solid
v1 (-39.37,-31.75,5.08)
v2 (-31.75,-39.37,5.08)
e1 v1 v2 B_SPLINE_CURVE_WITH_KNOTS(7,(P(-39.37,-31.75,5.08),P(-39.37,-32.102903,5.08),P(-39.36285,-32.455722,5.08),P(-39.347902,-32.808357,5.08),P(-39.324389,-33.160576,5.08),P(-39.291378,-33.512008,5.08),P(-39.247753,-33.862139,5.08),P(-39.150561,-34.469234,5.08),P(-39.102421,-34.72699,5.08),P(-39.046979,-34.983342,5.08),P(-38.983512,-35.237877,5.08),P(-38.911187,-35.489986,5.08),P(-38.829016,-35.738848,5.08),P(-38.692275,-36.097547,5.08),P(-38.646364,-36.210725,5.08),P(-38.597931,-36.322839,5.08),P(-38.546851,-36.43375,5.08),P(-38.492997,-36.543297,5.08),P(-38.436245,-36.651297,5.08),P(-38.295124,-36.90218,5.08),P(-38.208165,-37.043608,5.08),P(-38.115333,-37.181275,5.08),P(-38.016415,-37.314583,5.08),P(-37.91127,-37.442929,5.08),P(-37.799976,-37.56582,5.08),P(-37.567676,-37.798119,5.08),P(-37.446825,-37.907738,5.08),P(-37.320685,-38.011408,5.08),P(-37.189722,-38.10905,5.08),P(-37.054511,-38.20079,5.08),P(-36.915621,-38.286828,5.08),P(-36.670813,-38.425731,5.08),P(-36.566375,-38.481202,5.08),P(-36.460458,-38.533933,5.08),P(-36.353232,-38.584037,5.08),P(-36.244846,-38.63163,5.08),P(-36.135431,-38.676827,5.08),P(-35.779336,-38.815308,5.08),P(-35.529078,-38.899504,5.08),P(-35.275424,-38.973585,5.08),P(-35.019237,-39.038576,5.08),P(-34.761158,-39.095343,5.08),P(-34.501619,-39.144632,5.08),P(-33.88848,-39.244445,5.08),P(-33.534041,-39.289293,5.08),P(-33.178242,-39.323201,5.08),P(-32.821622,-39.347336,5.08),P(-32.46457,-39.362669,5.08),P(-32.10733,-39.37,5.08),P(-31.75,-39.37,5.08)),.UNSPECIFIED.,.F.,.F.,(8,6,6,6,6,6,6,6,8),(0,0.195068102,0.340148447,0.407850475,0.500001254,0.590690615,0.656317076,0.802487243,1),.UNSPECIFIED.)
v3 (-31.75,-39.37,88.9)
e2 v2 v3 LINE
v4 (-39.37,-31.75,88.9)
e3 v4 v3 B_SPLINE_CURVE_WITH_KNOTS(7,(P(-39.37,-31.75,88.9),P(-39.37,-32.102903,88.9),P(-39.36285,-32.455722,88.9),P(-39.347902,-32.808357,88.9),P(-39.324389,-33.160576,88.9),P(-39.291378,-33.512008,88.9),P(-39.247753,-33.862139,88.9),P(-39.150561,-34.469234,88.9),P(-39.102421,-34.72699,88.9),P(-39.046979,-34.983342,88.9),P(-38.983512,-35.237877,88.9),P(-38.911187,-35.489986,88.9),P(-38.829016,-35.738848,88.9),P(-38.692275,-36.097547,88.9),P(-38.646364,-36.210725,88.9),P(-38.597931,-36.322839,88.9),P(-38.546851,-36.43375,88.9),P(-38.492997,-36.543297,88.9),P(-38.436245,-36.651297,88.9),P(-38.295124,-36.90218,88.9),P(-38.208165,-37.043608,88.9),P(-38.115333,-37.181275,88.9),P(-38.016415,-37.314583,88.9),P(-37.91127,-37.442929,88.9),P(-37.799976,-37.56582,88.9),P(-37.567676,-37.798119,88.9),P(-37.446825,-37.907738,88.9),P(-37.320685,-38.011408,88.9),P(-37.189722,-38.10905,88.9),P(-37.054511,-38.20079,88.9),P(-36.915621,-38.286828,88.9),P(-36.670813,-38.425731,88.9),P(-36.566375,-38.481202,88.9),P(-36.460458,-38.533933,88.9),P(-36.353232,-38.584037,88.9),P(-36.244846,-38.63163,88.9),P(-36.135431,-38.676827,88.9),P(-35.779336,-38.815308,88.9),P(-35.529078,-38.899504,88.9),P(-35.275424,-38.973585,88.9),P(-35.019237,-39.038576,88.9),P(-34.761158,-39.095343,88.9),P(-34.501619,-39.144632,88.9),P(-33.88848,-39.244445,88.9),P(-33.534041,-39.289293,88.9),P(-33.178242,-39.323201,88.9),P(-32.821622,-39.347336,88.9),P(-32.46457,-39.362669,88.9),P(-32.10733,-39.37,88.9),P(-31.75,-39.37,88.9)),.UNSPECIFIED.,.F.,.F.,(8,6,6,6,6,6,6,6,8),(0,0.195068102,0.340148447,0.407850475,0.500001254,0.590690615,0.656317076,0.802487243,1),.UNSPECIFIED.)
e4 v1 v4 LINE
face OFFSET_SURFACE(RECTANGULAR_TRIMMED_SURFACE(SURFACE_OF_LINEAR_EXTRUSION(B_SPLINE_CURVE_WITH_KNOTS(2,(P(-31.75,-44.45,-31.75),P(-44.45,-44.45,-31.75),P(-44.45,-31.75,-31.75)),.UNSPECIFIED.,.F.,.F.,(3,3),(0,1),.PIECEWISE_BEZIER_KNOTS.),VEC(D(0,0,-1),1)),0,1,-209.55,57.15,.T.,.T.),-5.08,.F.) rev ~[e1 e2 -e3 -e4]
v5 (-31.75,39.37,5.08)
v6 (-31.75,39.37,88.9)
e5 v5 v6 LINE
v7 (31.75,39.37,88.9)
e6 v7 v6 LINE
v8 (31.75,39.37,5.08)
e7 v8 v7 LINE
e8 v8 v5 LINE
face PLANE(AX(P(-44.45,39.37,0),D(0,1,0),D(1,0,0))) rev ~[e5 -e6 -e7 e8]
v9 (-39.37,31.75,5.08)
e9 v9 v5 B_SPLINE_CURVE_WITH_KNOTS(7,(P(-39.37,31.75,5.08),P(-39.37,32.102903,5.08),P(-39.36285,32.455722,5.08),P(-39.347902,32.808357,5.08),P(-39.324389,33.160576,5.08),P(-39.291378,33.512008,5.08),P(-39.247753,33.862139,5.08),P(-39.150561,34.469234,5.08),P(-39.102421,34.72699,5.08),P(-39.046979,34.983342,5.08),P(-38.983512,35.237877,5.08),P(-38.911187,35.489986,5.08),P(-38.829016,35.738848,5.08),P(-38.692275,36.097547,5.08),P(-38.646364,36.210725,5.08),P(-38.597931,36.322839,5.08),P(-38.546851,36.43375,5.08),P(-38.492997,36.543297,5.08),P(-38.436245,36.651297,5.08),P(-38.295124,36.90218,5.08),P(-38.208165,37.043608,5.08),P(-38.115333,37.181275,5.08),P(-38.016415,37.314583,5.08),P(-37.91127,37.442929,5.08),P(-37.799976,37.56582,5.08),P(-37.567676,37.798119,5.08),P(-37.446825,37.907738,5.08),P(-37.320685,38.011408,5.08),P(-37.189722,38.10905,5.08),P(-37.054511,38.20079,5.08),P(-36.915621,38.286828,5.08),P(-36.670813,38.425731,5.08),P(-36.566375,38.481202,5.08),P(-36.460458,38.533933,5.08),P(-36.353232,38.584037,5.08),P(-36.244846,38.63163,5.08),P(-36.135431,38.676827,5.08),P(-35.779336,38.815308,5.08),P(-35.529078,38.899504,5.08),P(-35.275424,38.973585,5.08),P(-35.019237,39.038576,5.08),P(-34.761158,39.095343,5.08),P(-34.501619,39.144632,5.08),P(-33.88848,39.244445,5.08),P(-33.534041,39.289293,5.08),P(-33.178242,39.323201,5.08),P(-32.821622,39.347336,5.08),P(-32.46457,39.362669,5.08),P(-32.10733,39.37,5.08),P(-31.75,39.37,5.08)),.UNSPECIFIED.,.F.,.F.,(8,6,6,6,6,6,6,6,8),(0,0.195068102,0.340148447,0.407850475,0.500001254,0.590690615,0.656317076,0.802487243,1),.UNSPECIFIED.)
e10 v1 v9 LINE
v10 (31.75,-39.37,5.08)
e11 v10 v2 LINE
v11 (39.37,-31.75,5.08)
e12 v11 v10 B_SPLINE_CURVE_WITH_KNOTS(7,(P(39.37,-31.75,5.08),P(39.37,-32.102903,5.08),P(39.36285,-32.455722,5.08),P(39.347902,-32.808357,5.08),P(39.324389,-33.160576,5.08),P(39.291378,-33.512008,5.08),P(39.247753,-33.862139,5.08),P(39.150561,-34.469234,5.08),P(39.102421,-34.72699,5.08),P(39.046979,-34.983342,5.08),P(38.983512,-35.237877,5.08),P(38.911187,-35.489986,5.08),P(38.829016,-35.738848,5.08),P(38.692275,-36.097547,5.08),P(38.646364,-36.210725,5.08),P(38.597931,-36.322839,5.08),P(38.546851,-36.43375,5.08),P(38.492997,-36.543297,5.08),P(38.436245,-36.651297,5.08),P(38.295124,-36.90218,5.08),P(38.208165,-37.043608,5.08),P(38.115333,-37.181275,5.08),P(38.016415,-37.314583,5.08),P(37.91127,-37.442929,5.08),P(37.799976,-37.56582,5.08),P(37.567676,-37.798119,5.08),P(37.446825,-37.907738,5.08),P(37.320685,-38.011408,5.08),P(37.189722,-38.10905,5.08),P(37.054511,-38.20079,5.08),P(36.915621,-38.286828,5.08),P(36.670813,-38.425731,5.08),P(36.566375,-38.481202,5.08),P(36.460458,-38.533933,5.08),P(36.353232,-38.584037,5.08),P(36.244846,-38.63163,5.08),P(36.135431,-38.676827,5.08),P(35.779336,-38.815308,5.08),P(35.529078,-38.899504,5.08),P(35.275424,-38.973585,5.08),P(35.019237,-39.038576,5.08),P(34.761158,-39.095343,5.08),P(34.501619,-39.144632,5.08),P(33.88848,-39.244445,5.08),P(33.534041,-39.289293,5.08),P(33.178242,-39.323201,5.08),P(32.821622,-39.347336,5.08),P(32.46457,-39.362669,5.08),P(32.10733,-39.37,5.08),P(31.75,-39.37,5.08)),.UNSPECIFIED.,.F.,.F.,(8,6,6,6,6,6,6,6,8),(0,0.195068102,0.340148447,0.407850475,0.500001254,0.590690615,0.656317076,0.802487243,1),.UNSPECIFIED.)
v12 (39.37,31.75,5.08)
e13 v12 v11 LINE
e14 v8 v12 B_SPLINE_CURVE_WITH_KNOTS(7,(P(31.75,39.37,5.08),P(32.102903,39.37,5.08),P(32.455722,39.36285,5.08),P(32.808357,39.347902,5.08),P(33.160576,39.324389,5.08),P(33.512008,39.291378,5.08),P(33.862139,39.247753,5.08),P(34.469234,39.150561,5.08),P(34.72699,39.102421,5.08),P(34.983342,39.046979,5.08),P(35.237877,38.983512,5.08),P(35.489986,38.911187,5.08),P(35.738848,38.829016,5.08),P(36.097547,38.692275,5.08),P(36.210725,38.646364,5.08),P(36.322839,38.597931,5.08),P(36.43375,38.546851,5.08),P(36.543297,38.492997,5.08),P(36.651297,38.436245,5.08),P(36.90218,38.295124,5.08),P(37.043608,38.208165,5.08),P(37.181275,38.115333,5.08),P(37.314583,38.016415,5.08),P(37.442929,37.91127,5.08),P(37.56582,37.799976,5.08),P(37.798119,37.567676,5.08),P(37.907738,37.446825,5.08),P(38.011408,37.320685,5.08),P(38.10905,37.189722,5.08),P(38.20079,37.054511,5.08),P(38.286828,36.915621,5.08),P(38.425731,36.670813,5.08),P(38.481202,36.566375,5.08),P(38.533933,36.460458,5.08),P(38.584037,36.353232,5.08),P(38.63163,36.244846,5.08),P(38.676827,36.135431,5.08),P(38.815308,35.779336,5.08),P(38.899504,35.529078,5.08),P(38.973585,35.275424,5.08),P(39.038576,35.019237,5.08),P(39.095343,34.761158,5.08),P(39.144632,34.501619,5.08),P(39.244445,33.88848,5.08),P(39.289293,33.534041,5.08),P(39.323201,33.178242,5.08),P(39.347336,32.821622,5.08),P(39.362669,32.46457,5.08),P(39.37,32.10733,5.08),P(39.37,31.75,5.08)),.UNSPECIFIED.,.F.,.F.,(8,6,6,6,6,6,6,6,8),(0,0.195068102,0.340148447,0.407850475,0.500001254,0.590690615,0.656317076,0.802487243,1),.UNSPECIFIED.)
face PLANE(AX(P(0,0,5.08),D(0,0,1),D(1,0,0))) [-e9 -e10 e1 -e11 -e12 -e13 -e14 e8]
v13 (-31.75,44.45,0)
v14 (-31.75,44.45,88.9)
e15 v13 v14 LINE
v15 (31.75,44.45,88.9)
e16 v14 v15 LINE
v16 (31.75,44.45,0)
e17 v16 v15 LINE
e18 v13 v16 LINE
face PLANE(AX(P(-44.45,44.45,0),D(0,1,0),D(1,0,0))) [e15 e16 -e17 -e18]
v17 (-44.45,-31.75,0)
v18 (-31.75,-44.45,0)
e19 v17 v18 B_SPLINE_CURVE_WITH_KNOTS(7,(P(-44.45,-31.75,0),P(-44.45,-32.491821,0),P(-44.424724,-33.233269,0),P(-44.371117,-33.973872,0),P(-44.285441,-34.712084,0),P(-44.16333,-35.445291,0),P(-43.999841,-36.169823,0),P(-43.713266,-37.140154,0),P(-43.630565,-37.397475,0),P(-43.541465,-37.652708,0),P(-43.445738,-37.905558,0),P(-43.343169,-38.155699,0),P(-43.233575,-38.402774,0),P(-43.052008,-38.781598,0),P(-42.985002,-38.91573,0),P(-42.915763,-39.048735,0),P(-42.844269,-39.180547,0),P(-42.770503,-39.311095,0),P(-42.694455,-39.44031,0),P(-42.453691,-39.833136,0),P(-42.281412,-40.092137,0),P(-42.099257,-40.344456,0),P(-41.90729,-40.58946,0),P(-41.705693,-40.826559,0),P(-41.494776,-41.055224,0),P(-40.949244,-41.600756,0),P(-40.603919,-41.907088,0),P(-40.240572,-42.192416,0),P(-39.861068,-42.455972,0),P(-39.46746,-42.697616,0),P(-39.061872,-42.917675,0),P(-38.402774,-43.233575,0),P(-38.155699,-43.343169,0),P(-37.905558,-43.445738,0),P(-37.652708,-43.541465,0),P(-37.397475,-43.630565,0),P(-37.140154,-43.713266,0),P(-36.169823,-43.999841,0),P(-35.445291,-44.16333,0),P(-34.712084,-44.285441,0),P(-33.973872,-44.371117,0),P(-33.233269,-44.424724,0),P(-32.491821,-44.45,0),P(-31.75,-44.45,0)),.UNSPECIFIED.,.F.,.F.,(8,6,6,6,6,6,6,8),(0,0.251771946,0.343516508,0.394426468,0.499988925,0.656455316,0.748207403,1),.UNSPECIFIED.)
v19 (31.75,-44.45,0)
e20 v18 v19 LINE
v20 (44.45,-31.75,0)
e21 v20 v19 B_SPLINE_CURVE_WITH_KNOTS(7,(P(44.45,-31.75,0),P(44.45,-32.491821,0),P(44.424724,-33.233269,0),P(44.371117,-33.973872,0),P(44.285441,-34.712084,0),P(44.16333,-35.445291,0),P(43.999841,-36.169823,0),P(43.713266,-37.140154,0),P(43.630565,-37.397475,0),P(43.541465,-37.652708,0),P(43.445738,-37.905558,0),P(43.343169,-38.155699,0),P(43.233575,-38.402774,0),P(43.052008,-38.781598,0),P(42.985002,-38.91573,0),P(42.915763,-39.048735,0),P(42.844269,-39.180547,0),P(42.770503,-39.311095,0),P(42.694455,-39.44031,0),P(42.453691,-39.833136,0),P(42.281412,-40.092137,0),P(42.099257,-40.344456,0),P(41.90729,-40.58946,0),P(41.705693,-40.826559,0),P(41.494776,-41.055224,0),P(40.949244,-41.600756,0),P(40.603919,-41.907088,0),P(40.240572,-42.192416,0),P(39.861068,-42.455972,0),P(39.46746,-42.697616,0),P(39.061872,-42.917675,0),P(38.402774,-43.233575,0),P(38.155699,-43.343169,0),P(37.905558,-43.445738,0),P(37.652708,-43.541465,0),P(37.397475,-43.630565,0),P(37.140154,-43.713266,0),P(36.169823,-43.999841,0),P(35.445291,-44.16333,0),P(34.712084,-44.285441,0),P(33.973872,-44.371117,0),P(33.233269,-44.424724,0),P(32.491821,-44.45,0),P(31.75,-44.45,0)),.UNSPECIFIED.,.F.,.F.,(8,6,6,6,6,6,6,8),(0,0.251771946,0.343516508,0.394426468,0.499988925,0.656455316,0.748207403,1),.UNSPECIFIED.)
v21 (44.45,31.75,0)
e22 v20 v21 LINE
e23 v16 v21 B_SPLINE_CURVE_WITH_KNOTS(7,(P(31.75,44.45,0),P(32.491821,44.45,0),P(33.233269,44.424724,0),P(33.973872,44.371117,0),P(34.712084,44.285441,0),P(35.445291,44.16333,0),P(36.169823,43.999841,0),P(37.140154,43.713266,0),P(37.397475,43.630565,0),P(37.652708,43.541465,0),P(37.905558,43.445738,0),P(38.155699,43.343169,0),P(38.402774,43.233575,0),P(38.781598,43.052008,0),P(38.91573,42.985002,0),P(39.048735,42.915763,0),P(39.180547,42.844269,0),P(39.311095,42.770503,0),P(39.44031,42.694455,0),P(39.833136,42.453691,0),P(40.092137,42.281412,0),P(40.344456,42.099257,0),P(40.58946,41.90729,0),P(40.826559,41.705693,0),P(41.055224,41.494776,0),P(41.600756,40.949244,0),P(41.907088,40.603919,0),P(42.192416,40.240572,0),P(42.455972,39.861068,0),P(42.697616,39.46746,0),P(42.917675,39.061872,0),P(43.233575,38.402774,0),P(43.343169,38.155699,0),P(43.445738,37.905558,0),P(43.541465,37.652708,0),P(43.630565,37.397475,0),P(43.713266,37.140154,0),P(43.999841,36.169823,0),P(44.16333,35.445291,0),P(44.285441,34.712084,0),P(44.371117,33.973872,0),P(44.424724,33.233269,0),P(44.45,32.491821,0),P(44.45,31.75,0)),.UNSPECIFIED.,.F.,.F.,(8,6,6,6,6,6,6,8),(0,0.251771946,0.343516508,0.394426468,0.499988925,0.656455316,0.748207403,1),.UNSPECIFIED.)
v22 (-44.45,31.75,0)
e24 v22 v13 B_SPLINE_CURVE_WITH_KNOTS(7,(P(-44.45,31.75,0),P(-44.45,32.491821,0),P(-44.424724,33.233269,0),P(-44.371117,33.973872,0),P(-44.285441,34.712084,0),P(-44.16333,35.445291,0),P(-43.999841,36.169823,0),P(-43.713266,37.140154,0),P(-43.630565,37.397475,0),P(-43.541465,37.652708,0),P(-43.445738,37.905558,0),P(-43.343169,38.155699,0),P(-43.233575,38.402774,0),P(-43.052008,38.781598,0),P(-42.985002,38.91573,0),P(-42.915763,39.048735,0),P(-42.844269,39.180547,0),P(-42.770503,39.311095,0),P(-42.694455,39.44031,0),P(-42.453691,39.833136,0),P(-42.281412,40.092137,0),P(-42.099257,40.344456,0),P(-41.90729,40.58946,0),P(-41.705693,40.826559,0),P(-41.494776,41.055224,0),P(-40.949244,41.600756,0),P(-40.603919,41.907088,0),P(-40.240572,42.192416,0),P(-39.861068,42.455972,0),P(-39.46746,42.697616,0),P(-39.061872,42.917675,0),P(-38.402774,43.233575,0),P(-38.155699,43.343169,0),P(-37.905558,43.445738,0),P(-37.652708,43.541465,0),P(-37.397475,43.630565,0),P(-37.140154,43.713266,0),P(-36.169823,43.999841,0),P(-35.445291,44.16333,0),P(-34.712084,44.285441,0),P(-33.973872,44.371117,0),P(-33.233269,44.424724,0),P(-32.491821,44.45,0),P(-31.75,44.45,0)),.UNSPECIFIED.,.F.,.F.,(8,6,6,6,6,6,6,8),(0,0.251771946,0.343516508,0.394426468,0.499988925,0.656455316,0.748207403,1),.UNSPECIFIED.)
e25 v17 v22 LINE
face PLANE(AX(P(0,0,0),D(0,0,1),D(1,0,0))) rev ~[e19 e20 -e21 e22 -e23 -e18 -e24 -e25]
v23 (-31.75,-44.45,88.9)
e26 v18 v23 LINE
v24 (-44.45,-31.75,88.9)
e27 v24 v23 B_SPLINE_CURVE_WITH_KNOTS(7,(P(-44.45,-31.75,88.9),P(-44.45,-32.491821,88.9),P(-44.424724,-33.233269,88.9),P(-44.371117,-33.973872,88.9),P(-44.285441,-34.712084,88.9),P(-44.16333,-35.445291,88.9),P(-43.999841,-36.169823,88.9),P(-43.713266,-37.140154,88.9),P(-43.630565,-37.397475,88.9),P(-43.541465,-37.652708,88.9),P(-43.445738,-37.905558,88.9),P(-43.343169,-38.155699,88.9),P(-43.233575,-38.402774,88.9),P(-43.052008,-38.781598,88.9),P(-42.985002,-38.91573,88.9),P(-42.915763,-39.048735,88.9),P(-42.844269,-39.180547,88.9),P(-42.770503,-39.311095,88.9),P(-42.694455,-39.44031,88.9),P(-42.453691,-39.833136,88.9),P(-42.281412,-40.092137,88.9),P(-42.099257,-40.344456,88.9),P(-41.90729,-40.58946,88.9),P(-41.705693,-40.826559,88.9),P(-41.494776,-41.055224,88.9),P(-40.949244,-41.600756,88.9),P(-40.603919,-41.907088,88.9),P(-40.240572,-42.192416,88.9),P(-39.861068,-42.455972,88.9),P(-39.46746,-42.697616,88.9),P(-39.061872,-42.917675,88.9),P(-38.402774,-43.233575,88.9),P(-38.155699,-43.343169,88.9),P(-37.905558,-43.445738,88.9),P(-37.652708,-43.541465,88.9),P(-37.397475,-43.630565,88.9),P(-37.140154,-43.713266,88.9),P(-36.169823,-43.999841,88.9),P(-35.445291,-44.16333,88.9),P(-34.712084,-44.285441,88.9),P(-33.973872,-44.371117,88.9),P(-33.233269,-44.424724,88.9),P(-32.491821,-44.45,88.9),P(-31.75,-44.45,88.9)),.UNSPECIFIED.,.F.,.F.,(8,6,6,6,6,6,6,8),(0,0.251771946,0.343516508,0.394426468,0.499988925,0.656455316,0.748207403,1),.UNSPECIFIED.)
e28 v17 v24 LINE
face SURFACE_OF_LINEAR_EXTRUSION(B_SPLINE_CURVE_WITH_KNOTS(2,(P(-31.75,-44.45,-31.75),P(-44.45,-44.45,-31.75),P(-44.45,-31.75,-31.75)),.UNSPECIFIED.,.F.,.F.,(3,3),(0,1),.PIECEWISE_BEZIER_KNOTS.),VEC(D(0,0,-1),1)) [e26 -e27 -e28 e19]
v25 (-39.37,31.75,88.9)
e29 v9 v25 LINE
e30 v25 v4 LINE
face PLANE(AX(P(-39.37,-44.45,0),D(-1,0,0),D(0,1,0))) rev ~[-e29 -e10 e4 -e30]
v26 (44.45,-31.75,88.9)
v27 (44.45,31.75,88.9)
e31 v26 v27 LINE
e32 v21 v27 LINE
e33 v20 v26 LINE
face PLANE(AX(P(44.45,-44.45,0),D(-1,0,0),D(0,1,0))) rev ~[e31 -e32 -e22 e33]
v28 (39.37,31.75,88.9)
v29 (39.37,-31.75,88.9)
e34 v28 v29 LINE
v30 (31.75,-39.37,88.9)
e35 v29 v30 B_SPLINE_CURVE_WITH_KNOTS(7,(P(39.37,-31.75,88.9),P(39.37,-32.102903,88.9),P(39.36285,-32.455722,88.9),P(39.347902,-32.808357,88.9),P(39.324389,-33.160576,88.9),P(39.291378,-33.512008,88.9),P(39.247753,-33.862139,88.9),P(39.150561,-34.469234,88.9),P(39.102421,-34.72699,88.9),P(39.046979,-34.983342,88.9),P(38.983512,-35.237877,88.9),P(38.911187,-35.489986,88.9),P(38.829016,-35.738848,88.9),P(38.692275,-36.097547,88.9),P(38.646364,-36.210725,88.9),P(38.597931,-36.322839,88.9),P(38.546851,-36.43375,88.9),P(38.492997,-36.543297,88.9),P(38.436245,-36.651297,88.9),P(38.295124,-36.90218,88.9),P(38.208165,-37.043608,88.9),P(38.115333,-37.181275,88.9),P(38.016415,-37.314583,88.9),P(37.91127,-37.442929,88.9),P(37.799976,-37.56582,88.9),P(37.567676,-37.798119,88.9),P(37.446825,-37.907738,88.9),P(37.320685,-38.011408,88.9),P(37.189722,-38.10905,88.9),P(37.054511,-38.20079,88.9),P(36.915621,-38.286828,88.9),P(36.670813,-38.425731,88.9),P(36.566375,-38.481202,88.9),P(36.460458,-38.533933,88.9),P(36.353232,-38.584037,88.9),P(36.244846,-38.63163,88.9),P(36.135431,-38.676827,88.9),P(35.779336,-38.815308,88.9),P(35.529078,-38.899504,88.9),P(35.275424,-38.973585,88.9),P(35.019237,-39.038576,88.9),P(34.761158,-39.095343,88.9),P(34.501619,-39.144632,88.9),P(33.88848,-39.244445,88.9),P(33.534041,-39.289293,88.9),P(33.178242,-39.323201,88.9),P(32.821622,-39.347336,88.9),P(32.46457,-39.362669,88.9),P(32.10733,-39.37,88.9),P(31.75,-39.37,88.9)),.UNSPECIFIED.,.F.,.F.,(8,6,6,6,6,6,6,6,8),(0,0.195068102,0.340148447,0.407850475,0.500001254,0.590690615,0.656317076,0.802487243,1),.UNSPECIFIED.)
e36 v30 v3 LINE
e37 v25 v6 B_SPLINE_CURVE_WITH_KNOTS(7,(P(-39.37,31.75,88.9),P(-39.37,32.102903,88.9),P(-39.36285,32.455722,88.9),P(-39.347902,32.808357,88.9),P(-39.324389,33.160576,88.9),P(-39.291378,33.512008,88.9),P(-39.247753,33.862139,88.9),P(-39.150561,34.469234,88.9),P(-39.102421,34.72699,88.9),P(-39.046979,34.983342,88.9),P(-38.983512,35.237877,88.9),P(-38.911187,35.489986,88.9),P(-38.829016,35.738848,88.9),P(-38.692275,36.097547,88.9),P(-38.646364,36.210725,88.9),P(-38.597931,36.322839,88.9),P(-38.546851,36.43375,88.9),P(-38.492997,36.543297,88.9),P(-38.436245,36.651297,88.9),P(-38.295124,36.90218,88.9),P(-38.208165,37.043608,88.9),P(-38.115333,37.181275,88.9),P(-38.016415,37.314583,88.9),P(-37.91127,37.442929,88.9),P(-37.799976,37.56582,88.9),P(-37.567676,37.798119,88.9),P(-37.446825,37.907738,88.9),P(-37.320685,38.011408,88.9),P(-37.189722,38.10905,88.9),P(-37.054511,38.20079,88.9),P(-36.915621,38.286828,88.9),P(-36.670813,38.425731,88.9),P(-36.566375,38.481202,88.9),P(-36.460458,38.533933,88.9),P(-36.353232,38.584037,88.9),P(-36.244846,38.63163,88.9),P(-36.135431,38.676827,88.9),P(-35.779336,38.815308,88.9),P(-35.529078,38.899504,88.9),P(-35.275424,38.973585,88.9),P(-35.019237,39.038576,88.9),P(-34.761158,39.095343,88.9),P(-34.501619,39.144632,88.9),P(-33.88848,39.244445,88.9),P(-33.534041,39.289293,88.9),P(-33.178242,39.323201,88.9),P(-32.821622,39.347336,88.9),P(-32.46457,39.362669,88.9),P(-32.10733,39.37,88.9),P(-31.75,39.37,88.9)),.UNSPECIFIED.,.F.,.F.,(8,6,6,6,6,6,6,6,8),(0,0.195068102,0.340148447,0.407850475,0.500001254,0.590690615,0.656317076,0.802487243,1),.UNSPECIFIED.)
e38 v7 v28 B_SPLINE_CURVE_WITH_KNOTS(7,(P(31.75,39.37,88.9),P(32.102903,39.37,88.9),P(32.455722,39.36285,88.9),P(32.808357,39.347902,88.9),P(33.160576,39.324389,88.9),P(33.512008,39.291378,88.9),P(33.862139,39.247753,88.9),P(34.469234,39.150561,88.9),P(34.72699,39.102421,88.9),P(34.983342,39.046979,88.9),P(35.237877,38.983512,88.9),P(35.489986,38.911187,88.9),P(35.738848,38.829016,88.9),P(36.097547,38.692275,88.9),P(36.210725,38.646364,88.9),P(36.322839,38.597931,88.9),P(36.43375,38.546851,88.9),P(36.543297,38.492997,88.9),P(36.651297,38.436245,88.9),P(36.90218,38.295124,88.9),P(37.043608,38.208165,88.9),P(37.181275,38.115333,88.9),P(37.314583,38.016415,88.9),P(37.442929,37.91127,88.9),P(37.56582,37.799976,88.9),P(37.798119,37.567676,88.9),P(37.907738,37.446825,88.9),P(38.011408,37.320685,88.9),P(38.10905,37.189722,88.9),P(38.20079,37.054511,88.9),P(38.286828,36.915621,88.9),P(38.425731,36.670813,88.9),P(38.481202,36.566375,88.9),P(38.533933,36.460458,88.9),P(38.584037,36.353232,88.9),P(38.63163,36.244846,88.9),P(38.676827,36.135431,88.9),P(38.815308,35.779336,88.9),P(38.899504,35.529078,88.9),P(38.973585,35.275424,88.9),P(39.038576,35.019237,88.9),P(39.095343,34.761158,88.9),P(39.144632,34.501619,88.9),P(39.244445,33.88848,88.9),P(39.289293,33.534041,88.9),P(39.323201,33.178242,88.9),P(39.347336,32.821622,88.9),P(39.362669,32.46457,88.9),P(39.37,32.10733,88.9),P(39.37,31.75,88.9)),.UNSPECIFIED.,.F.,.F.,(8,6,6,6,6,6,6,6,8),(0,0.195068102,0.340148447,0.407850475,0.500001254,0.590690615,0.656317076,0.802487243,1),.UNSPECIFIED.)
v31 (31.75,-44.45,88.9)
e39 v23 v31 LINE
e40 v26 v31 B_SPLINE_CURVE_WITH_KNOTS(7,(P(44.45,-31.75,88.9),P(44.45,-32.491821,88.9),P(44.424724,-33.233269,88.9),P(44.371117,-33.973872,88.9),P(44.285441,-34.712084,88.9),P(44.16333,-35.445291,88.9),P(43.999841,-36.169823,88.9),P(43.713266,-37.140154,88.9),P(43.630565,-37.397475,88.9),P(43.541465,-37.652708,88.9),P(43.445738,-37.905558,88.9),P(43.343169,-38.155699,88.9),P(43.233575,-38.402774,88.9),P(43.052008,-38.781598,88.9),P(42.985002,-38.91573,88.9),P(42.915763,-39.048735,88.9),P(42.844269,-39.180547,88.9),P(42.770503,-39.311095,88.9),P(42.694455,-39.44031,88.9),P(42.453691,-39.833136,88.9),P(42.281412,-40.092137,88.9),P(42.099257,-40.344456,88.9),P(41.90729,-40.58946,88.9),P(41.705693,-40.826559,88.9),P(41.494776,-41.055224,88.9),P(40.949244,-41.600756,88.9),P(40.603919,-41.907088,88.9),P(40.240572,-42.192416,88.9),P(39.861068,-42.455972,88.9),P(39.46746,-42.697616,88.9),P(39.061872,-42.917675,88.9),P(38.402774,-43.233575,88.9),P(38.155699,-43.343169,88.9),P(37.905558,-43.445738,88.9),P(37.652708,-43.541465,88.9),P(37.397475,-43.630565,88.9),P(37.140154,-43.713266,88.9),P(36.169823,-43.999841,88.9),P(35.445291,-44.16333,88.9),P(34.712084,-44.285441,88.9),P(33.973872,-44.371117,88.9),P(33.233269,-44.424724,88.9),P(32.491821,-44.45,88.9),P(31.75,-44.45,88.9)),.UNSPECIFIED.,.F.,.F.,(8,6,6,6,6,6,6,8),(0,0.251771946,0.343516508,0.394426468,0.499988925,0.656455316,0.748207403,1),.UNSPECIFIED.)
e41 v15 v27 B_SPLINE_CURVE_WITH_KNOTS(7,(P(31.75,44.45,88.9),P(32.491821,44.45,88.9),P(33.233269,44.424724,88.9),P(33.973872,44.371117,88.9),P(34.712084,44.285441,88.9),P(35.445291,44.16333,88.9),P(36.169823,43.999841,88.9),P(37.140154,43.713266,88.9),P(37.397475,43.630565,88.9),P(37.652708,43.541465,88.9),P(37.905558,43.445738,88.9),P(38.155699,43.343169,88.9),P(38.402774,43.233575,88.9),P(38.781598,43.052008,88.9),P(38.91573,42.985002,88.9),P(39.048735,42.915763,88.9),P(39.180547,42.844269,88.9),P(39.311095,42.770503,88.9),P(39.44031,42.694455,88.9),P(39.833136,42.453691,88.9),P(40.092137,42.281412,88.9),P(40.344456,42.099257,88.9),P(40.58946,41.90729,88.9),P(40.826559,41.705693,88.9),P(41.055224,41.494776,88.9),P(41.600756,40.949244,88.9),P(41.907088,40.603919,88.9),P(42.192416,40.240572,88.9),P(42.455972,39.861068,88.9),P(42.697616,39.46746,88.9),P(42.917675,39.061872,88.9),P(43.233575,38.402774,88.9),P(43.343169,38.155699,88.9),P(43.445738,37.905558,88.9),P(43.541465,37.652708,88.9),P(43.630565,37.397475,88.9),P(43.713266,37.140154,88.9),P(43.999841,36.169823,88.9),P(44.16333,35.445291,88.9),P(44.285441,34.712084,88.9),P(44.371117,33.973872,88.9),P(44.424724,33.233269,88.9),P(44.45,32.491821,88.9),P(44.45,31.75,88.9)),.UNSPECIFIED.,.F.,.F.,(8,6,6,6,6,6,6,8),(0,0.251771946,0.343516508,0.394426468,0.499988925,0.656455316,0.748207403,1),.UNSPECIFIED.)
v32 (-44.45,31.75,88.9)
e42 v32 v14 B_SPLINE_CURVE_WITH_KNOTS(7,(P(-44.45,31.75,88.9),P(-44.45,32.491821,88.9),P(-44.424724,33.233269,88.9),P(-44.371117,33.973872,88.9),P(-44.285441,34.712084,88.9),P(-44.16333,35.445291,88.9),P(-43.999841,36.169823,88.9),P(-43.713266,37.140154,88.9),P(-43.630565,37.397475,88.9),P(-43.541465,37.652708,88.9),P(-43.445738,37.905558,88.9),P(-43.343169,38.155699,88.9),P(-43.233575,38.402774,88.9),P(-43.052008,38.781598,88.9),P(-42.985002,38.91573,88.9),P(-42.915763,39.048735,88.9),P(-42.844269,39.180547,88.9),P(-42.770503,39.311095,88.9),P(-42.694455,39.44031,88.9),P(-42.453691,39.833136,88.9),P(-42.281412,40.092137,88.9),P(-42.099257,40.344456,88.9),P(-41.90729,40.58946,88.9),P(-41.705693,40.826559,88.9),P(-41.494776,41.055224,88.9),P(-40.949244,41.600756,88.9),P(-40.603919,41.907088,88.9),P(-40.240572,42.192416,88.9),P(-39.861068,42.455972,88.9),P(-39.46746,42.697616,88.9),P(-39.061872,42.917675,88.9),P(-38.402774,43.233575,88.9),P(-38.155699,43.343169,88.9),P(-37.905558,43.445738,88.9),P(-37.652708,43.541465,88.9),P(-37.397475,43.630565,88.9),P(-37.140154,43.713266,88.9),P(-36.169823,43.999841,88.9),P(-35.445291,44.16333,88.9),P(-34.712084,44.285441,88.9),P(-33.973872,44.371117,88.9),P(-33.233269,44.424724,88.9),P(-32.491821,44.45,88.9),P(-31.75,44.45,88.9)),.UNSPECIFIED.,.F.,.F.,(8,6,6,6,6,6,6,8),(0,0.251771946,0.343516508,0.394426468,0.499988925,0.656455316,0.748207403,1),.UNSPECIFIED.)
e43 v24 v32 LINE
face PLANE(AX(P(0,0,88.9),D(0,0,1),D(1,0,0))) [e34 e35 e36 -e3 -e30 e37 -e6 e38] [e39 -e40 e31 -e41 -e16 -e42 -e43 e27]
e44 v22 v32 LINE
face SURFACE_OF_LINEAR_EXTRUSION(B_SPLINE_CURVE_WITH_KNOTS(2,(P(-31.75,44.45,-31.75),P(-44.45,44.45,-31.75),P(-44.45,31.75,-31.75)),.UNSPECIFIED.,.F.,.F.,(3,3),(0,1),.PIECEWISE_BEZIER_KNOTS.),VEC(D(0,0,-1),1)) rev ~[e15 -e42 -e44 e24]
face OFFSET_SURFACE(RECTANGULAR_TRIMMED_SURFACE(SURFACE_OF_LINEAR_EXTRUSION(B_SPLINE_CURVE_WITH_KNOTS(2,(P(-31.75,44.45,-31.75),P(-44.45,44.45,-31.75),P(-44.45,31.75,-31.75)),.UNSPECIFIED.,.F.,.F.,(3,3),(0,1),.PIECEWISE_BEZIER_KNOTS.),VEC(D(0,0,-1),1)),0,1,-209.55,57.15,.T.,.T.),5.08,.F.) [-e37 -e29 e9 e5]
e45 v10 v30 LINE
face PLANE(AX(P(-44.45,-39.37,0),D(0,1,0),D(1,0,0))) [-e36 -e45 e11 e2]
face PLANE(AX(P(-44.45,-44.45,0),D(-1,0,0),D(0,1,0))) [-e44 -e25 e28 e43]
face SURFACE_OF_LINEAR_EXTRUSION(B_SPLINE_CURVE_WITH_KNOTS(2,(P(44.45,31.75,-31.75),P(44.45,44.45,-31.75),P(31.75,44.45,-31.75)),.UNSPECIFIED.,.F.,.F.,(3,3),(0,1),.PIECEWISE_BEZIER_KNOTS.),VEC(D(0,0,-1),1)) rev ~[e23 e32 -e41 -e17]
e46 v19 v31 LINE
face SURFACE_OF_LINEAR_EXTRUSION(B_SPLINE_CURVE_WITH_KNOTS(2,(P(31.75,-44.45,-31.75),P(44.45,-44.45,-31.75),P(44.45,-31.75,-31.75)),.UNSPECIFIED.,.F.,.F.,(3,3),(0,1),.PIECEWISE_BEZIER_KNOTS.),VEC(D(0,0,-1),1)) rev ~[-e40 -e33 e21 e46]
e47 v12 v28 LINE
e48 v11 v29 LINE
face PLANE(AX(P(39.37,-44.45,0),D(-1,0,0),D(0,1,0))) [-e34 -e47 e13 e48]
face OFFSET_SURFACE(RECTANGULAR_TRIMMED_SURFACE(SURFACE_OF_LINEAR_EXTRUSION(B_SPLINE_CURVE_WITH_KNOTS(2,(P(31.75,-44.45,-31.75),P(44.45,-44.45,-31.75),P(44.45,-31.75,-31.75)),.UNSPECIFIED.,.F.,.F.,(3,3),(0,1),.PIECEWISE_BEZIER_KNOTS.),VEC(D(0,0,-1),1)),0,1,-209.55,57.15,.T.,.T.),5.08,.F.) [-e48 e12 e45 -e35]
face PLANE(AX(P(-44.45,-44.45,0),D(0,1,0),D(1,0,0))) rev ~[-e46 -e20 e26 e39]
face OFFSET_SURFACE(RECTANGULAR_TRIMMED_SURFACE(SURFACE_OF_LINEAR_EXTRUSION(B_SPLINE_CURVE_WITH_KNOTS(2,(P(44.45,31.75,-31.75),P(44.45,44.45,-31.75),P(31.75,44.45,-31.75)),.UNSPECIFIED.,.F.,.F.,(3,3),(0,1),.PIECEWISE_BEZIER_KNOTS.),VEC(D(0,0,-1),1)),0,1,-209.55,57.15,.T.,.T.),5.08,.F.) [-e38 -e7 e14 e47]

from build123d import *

# Parameters (mm, degrees)
F0_W        = 88.9
F0_H        = 88.9
F1_DEPTH    = 88.9
F2_T1_DEPTH = 152.4
F3_T        = -5.08


# Not quite as in the source:
# - a fillet or chamfer that OpenCascade refuses, or shapes differently, is made with other operations: its cross-section is extruded or revolved along the edge and cut away or added


with BuildPart() as f1:
    # F0 (on Top) → F1 (new body)
    with BuildSketch(Plane.XY):
        Rectangle(F0_W, F0_H)
    extrude(amount=F1_DEPTH)

    # F2: fillet of radius 12.7 on 4 edges, made by hand

    # F2_s2 → F2_t1 (cut)
    with BuildSketch(Plane.XY.offset(-31.75)):
        with BuildLine():
            add(Edge.make_bspline(
                [(31.75, -44.45), (44.45, -44.45), (44.45, -31.75)],
                knots=[0, 0, 0, 1, 1, 1], degree=2, weights=[1, 1, 1]))
            Line((44.45, -31.75), (44.45, -44.45))
            Line((44.45, -44.45), (31.75, -44.45))
        make_face()
        with BuildLine():
            add(Edge.make_bspline(
                [(44.45, 31.75), (44.45, 44.45), (31.75, 44.45)],
                knots=[0, 0, 0, 1, 1, 1], degree=2, weights=[1, 1, 1]))
            Line((31.75, 44.45), (44.45, 44.45))
            Line((44.45, 44.45), (44.45, 31.75))
        make_face()
        with BuildLine():
            add(Edge.make_bspline(
                [(-31.75, -44.45), (-44.45, -44.45), (-44.45, -31.75)],
                knots=[0, 0, 0, 1, 1, 1], degree=2, weights=[1, 1, 1]))
            Line((-44.45, -31.75), (-44.45, -44.45))
            Line((-44.45, -44.45), (-31.75, -44.45))
        make_face()
        with BuildLine():
            add(Edge.make_bspline(
                [(-31.75, 44.45), (-44.45, 44.45), (-44.45, 31.75)],
                knots=[0, 0, 0, 1, 1, 1], degree=2, weights=[1, 1, 1]))
            Line((-44.45, 31.75), (-44.45, 44.45))
            Line((-44.45, 44.45), (-31.75, 44.45))
        make_face()
    extrude(amount=F2_T1_DEPTH, mode=Mode.SUBTRACT)

    # F3
    f3_openings = [f1.faces().sort_by_distance(p)[0] for p in [
        (0, 0, 88.9),
    ]]
    offset(amount=F3_T, openings=f3_openings, kind=Kind.INTERSECTION)


solid = f1.part
